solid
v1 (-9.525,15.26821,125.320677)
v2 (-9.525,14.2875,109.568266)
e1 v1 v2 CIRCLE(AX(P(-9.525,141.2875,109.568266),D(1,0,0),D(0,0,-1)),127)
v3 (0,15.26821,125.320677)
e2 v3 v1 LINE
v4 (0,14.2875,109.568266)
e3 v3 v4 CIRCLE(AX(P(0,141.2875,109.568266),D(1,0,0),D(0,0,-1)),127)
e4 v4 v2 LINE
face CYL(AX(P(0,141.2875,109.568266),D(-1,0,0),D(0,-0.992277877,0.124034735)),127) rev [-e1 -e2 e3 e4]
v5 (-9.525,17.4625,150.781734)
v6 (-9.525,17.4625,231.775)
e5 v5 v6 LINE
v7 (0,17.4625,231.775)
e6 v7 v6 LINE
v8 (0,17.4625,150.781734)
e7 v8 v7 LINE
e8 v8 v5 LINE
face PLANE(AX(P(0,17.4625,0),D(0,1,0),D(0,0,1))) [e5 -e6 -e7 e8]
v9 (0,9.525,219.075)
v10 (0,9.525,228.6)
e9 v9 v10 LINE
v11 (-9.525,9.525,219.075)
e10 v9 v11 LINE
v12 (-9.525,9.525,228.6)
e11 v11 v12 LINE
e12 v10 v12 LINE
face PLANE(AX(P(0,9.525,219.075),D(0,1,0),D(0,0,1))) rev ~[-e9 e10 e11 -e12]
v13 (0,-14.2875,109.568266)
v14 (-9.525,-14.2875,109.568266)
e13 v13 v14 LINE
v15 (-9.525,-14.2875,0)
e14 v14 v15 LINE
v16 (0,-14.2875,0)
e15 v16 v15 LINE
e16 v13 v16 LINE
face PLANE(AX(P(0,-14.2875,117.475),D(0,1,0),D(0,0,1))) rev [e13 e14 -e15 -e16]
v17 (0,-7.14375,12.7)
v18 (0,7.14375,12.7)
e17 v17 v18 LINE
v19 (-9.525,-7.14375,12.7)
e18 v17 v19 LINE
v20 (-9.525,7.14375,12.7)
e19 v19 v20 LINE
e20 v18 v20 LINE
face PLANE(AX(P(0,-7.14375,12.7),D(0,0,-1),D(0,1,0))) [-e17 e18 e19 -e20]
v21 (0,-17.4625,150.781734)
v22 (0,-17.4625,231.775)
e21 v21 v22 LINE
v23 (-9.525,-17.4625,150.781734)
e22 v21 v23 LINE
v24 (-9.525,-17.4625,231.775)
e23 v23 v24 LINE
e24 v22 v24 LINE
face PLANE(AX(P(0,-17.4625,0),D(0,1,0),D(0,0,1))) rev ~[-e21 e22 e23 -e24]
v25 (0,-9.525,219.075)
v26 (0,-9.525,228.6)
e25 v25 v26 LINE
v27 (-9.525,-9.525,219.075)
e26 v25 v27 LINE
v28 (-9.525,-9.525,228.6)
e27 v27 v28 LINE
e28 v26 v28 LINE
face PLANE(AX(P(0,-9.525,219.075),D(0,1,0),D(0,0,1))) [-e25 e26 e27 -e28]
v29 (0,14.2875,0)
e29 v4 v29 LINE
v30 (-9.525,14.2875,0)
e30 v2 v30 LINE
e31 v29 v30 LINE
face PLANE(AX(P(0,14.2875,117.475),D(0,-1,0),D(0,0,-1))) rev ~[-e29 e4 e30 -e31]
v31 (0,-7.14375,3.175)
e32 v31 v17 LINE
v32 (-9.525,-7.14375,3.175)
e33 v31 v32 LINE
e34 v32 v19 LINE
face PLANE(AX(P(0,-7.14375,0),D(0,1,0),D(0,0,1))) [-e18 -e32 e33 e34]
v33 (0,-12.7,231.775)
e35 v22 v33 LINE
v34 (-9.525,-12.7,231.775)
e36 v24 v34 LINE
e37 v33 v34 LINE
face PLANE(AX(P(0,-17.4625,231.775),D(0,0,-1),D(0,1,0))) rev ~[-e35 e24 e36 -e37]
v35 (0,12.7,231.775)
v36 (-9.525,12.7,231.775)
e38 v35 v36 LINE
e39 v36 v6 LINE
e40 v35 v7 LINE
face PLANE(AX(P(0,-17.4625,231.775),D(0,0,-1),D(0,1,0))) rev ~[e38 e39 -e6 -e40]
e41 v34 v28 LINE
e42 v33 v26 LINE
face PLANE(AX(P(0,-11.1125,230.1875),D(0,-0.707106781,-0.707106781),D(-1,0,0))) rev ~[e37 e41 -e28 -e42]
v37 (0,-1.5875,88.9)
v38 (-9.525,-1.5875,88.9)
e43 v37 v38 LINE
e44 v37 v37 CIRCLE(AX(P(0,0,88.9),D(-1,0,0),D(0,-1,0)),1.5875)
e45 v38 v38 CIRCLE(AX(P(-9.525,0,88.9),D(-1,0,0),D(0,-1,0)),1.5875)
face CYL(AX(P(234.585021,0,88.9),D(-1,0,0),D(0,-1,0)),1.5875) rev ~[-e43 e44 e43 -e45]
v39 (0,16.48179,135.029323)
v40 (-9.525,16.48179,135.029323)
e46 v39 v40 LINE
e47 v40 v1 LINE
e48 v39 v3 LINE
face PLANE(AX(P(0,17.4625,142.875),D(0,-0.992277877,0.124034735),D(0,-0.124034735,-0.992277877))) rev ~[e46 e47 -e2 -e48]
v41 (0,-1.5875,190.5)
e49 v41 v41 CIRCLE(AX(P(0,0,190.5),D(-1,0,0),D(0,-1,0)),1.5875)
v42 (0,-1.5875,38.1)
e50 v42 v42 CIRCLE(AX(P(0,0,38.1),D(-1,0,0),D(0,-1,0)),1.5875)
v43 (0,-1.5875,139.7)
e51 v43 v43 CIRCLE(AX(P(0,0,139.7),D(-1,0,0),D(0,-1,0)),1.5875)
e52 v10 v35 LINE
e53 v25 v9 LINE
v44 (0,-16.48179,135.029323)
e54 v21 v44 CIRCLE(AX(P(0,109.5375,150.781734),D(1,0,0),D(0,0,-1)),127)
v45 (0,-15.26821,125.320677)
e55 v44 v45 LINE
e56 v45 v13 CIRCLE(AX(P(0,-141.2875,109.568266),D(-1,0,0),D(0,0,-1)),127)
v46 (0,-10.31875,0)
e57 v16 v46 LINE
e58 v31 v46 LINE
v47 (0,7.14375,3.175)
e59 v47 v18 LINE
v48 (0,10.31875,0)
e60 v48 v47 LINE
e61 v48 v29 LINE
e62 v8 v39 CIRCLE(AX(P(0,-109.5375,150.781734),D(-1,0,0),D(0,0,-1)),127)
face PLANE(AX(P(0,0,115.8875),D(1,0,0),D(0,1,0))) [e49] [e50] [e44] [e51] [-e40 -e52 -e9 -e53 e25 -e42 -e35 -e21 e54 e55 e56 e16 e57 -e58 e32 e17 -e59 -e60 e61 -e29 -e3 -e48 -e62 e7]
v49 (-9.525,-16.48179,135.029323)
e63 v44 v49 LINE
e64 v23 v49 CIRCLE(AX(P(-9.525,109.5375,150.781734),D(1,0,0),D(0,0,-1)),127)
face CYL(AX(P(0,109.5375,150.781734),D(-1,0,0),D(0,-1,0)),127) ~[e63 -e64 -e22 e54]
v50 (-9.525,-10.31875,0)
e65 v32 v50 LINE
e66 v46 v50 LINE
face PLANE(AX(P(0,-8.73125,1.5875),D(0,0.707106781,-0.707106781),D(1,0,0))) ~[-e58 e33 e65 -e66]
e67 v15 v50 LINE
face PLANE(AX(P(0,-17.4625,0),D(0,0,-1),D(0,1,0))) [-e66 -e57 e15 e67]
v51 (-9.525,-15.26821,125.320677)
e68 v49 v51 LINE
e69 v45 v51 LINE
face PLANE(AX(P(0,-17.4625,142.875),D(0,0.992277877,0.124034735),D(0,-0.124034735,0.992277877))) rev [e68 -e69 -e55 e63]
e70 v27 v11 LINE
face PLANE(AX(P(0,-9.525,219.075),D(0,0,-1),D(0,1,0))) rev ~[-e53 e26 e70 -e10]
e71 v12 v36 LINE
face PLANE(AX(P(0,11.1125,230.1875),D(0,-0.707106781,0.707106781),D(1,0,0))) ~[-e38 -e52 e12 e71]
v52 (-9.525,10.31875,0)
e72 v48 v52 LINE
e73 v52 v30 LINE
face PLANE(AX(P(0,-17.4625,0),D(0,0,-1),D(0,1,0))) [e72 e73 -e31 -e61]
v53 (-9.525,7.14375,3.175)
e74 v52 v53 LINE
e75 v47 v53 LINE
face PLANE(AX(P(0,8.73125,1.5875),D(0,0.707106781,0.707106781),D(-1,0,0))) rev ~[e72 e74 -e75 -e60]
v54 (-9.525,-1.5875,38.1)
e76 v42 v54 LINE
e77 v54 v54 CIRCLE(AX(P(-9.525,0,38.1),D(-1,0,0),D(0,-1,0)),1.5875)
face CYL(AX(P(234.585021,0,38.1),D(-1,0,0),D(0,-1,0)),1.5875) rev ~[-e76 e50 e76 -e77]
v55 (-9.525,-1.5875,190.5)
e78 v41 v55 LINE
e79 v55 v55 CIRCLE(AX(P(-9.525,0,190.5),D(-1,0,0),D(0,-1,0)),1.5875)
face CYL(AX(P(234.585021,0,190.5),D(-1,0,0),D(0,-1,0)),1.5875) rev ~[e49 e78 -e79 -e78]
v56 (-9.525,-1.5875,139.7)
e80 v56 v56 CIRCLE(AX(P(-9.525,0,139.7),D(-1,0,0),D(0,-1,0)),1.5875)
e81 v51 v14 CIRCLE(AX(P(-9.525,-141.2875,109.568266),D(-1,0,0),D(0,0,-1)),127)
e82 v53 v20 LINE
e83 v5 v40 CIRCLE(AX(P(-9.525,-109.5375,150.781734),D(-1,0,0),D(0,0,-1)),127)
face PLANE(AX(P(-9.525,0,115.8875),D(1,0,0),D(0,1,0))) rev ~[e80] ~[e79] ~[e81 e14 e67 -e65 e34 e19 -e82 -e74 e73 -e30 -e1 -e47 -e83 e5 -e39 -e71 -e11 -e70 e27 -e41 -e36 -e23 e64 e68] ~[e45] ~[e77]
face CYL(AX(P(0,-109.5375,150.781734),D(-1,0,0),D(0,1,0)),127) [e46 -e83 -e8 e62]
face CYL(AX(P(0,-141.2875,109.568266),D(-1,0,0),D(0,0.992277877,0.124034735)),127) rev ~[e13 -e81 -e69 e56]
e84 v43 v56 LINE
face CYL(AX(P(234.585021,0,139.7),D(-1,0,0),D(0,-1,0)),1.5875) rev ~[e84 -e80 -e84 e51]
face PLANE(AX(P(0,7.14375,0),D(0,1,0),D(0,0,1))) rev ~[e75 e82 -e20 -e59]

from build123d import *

# Parameters (mm, degrees)
F0_W     = 34.925
F0_H     = 231.775
F1_DEPTH = 9.525
F3_DEPTH = 9.525
F4_R     = 127
F5_W     = 19.05
F5_H     = 12.7
F5_W_2   = 14.2875
F6_DEPTH = 9.525
F7_SIZE  = 3.175
F9_D     = 3.175


# Not quite as in the source:
# - a pattern or mirror of a feature is missing from the dataset's text; its kind, count and spacing are read off the source's solid


with BuildPart() as f1:
    # F0 (on Right) → F1 (new body)
    with BuildSketch(Plane.YZ):
        with Locations((0, 115.8875)):
            Rectangle(F0_W, F0_H)
    extrude(amount=-F1_DEPTH)

    # F2 (on face) → F3 (cut, through all)
    with BuildSketch(Plane.YZ):
        Polygon((14.2875, 117.475), (14.2875, 0), (17.4625, 0), (17.4625, 142.875), align=None)
    f3 = extrude(amount=-F3_DEPTH, mode=Mode.SUBTRACT)

    # F3_copies: F3 across plane
    add(f3.mirror(Plane(origin=(0, 0, 0), x_dir=(0, 0, -1), z_dir=(0, -1, 0))), mode=Mode.SUBTRACT)

    # F4
    f4_edges = [f1.edges().sort_by_distance(p)[0] for p in [
        (-4.7625, 14.2875, 117.475),
        (-4.7625, 17.4625, 142.875),
        (-4.7625, -17.4625, 142.875),
        (-4.7625, -14.2875, 117.475),
    ]]
    fillet(f4_edges, radius=F4_R)

    # F5 (on face) → F6 (cut, through all)
    with BuildSketch(Plane.YZ):
        with Locations((0, 225.425)):
            Rectangle(F5_W, F5_H)
        with Locations((0, 6.35)):
            Rectangle(F5_W_2, F5_H)
    extrude(amount=-F6_DEPTH, mode=Mode.SUBTRACT)

    # F7
    f7_edges = [f1.edges().sort_by_distance(p)[0] for p in [
        (-4.7625, -9.525, 231.775),
        (-4.7625, 9.525, 231.775),
        (-4.7625, -7.14375, 0),
        (-4.7625, 7.14375, 0),
    ]]
    chamfer(f7_edges, length=F7_SIZE)

    # F9 (through all)
    with Locations(Plane.YZ):
        with Locations((0, 139.7), (0, 88.9), (0, 190.5), (0, 38.1)):
            Hole(F9_D / 2)


solid = f1.part
